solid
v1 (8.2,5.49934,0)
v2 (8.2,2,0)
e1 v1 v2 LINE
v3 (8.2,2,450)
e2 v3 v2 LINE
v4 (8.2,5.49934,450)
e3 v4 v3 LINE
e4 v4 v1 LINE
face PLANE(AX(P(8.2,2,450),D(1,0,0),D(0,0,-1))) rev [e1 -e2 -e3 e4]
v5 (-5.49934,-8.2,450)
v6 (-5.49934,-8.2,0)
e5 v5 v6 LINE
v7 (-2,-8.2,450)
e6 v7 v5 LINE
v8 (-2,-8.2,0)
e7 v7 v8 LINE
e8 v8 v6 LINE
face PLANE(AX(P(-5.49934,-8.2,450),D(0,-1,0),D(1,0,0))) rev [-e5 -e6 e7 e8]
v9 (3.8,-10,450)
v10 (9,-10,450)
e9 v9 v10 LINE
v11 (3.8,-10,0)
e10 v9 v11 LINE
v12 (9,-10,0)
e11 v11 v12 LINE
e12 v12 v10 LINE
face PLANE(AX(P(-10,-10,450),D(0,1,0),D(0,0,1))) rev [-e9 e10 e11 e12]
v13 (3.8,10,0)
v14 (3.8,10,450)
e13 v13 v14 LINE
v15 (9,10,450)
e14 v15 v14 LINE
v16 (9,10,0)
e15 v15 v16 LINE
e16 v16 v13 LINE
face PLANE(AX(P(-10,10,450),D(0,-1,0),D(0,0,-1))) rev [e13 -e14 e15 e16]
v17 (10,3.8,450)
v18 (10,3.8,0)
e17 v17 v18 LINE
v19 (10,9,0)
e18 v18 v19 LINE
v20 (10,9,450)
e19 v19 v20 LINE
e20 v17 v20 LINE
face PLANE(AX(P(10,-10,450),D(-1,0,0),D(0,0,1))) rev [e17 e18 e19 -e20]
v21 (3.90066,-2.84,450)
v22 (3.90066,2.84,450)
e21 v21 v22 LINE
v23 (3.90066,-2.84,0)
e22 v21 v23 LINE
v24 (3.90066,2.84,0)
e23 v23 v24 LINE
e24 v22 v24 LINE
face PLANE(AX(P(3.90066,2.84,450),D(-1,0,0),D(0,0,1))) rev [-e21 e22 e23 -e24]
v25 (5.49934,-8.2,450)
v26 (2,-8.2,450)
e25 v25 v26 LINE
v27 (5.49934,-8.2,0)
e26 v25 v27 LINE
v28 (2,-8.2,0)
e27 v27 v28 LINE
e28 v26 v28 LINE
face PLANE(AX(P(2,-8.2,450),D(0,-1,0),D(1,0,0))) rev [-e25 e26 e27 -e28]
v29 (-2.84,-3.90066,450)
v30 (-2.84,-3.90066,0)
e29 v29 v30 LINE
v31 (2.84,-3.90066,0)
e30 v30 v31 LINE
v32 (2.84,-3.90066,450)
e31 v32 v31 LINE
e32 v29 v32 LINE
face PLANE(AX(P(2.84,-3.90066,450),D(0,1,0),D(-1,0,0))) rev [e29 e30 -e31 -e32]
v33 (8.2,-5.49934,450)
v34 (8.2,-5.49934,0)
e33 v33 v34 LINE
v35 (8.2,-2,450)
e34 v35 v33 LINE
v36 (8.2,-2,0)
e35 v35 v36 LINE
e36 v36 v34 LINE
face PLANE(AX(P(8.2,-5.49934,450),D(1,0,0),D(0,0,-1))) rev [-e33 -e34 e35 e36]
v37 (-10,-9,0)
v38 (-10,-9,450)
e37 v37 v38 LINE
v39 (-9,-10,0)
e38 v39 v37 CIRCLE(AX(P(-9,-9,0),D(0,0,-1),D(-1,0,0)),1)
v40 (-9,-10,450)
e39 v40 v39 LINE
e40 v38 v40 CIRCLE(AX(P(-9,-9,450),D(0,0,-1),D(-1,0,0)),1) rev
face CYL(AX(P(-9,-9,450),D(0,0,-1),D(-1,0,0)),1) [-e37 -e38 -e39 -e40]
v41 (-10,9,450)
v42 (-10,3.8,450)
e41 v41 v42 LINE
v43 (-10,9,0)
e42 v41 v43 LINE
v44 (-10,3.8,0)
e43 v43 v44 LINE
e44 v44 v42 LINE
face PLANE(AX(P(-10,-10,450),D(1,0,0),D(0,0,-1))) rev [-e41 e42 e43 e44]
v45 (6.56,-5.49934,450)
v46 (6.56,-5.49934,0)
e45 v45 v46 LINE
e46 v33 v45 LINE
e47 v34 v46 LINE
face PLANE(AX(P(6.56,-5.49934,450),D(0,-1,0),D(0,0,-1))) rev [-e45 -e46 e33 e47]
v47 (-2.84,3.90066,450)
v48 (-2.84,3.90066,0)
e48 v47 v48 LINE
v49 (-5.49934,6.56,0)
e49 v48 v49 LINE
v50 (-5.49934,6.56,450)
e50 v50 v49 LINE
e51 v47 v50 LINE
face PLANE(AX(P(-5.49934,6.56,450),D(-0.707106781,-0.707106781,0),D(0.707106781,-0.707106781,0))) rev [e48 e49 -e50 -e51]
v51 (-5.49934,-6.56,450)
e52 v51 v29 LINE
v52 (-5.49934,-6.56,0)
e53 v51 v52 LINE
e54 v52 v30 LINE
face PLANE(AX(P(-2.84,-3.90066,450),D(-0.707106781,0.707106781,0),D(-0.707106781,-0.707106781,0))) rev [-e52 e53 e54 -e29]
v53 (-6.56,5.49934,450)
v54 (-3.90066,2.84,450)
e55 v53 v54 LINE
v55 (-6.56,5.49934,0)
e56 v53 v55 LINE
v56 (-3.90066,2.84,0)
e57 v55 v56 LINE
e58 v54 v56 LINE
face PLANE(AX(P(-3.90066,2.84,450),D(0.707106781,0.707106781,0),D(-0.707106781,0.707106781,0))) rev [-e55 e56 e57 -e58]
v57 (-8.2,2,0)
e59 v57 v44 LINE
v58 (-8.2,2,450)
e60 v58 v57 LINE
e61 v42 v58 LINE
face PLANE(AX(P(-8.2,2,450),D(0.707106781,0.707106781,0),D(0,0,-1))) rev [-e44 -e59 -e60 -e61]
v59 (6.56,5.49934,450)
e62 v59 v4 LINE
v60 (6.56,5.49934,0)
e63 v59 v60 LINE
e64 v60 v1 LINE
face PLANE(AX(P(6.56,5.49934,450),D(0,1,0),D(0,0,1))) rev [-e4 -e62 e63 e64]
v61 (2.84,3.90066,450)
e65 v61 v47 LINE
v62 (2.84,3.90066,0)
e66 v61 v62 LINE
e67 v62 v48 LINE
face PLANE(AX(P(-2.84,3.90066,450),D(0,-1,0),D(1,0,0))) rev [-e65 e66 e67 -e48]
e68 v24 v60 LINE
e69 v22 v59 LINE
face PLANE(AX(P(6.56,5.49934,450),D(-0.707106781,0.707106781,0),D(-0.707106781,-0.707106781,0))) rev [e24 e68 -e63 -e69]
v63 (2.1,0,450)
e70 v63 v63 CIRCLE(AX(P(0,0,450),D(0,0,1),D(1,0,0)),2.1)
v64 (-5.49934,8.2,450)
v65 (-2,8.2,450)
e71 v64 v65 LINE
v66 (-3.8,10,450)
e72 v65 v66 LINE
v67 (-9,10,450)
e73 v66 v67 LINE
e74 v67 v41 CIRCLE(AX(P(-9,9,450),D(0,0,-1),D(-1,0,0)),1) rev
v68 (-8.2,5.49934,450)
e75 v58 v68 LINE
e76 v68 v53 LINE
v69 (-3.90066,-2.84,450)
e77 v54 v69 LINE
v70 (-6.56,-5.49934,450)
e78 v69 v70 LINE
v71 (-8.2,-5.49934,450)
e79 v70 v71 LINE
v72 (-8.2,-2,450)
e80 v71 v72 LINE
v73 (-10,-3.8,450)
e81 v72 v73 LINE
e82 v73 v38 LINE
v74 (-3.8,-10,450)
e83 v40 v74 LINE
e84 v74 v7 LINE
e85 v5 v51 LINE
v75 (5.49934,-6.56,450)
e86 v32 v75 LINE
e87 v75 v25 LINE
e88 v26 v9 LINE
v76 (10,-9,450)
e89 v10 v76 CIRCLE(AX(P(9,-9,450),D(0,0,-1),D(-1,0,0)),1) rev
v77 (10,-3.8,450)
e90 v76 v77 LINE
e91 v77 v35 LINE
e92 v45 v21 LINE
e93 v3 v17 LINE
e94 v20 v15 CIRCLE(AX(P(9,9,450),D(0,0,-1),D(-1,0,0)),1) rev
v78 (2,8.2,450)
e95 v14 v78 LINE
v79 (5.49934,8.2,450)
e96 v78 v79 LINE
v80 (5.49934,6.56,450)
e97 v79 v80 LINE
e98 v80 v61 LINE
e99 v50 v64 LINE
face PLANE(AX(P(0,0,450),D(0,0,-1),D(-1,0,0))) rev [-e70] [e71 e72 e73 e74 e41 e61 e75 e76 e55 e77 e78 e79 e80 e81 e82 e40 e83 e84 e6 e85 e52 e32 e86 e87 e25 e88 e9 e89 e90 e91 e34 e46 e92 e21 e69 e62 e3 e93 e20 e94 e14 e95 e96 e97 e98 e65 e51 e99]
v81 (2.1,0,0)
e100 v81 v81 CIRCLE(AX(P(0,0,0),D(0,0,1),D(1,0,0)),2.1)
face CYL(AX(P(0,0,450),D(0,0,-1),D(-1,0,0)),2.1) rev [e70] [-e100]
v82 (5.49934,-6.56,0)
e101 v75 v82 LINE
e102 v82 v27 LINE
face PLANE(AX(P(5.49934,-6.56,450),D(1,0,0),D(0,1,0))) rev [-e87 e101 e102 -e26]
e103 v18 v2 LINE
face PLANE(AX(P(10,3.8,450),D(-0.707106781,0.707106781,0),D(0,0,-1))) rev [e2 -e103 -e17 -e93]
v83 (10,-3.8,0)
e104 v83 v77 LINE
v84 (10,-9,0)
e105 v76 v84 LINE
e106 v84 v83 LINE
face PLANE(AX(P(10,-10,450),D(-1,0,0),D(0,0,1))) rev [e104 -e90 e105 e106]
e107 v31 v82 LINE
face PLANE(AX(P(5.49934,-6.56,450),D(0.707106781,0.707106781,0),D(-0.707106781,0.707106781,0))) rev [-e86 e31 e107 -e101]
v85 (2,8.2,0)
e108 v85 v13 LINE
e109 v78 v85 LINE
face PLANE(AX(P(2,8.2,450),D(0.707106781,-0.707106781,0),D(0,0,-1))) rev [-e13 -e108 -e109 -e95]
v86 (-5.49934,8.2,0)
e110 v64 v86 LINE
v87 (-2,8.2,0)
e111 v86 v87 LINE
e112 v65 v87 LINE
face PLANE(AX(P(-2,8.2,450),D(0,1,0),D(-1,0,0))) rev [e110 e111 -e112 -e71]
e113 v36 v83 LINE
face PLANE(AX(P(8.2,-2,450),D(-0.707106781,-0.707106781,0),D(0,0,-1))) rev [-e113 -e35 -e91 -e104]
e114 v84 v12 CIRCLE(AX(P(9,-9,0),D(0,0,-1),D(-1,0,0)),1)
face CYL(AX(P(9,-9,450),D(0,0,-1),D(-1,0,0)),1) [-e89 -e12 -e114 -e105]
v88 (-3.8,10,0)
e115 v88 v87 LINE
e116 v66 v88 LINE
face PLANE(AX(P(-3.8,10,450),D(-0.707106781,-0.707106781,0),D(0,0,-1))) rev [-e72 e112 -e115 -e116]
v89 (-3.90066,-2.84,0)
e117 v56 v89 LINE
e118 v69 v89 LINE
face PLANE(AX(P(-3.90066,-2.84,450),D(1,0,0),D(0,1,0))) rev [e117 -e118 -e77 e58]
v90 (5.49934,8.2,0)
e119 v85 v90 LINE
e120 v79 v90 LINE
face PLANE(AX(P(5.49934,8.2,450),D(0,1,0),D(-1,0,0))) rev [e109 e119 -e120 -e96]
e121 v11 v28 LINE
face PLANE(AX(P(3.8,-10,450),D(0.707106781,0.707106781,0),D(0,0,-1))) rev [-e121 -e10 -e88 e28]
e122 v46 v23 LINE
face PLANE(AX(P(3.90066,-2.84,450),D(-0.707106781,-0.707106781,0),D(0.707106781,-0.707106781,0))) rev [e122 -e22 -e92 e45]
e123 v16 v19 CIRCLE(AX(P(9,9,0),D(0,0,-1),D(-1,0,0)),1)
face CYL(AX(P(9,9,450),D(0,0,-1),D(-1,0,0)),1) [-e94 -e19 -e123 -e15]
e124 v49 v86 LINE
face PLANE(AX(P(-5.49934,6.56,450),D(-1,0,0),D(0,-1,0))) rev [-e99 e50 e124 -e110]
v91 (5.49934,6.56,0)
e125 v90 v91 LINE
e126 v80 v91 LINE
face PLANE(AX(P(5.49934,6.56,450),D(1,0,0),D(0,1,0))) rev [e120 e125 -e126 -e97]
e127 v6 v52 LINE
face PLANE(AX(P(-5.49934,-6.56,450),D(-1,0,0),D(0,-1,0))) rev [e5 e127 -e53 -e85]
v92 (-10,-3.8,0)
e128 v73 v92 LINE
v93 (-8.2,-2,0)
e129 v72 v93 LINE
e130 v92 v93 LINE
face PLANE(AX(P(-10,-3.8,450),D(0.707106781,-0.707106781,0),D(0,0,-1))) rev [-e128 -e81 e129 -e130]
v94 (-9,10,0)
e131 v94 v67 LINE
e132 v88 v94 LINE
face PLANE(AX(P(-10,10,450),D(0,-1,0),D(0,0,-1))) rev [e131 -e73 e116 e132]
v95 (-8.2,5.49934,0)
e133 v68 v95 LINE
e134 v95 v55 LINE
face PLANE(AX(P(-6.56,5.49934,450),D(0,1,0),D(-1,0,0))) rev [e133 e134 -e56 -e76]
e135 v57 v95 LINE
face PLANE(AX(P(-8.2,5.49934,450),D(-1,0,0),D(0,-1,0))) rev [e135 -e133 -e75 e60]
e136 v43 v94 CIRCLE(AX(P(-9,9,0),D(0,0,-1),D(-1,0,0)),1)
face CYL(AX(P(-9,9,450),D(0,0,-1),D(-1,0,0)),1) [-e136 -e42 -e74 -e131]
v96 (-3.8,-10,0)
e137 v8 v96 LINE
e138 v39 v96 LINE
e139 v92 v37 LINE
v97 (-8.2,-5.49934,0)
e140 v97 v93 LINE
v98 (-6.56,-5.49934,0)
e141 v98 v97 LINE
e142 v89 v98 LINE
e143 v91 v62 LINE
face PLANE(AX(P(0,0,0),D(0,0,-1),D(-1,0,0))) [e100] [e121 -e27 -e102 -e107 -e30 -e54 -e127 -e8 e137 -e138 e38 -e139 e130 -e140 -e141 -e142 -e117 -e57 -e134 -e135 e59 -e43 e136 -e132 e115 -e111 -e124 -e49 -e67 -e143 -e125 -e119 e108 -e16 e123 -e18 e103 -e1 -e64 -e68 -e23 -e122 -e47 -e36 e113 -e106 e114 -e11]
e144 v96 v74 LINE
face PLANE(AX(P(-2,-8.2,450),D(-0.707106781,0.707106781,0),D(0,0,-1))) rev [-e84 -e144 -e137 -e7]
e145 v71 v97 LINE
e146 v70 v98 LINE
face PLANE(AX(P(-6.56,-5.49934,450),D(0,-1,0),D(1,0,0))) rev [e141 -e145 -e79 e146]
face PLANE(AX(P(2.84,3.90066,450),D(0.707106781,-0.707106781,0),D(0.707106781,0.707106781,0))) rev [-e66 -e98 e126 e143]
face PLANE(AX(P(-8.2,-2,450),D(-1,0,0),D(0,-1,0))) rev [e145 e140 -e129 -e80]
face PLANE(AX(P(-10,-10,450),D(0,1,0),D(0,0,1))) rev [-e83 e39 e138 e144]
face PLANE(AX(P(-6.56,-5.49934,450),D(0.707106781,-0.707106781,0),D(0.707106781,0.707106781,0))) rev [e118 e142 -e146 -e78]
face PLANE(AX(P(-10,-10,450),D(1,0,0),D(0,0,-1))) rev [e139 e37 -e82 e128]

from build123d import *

# Parameters (mm, degrees)
SKETCH1_W           = 20
SKETCH1_H           = 20
SKETCH1_R           = 2.1
BOSS_EXTRUDE1_DEPTH = 450
CUT_EXTRUDE1_DEPTH  = 451.22216738
FILLET1_R           = 1
CHAMFER1_SIZE       = 1.8


with BuildPart() as part:
    # Sketch1 → Boss-Extrude1 (new body)
    with BuildSketch(Plane.XY):
        Rectangle(SKETCH1_W, SKETCH1_H)
        Circle(SKETCH1_R, mode=Mode.SUBTRACT)
    extrude(amount=BOSS_EXTRUDE1_DEPTH)

    # Sketch2 → Cut-Extrude1 (cut, through all)
    with BuildSketch(Plane(origin=(0, 0, 0), x_dir=(-1, 0, 0), z_dir=(0, 0, -1))):
        Polygon((-3.900660172, 2.84), (-3.900660172, -2.84), (-6.56, -5.499339828), (-8.2, -5.499339828), (-8.2, -2), (-10, -2), (-10, 2), (-8.2, 2), (-8.2, 5.499339828), (-6.56, 5.499339828), align=None)
        Polygon((5.499339828, 6.56), (2.84, 3.900660172), (-2.84, 3.900660172), (-5.499339828, 6.56), (-5.499339828, 8.2), (-2, 8.2), (-2, 10), (2, 10), (2, 8.2), (5.499339828, 8.2), align=None)
        Polygon((6.56, -5.499339828), (3.900660172, -2.84), (3.900660172, 2.84), (6.56, 5.499339828), (8.2, 5.499339828), (8.2, 2), (10, 2), (10, -2), (8.2, -2), (8.2, -5.499339828), align=None)
        Polygon((-5.499339828, -6.56), (-2.84, -3.900660172), (2.84, -3.900660172), (5.499339828, -6.56), (5.499339828, -8.2), (2, -8.2), (2, -10), (-2, -10), (-2, -8.2), (-5.499339828, -8.2), align=None)
    extrude(amount=-CUT_EXTRUDE1_DEPTH, mode=Mode.SUBTRACT)

    # Fillet1
    fillet1_edges = [part.edges().sort_by_distance(p)[0] for p in [
        (10, -10, 225),
        (-10, -10, 225),
        (-10, 10, 225),
        (10, 10, 225),
    ]]
    fillet(fillet1_edges, radius=FILLET1_R)

    # Chamfer1
    chamfer1_edges = [part.edges().sort_by_distance(p)[0] for p in [
        (10, 2, 225),
        (10, -2, 225),
        (2, -10, 225),
        (-2, -10, 225),
        (-10, -2, 225),
        (-10, 2, 225),
        (2, 10, 225),
        (-2, 10, 225),
    ]]
    chamfer(chamfer1_edges, length=CHAMFER1_SIZE - 0.0001)  # a hair under: the kernel refuses the full size


solid = part.part
